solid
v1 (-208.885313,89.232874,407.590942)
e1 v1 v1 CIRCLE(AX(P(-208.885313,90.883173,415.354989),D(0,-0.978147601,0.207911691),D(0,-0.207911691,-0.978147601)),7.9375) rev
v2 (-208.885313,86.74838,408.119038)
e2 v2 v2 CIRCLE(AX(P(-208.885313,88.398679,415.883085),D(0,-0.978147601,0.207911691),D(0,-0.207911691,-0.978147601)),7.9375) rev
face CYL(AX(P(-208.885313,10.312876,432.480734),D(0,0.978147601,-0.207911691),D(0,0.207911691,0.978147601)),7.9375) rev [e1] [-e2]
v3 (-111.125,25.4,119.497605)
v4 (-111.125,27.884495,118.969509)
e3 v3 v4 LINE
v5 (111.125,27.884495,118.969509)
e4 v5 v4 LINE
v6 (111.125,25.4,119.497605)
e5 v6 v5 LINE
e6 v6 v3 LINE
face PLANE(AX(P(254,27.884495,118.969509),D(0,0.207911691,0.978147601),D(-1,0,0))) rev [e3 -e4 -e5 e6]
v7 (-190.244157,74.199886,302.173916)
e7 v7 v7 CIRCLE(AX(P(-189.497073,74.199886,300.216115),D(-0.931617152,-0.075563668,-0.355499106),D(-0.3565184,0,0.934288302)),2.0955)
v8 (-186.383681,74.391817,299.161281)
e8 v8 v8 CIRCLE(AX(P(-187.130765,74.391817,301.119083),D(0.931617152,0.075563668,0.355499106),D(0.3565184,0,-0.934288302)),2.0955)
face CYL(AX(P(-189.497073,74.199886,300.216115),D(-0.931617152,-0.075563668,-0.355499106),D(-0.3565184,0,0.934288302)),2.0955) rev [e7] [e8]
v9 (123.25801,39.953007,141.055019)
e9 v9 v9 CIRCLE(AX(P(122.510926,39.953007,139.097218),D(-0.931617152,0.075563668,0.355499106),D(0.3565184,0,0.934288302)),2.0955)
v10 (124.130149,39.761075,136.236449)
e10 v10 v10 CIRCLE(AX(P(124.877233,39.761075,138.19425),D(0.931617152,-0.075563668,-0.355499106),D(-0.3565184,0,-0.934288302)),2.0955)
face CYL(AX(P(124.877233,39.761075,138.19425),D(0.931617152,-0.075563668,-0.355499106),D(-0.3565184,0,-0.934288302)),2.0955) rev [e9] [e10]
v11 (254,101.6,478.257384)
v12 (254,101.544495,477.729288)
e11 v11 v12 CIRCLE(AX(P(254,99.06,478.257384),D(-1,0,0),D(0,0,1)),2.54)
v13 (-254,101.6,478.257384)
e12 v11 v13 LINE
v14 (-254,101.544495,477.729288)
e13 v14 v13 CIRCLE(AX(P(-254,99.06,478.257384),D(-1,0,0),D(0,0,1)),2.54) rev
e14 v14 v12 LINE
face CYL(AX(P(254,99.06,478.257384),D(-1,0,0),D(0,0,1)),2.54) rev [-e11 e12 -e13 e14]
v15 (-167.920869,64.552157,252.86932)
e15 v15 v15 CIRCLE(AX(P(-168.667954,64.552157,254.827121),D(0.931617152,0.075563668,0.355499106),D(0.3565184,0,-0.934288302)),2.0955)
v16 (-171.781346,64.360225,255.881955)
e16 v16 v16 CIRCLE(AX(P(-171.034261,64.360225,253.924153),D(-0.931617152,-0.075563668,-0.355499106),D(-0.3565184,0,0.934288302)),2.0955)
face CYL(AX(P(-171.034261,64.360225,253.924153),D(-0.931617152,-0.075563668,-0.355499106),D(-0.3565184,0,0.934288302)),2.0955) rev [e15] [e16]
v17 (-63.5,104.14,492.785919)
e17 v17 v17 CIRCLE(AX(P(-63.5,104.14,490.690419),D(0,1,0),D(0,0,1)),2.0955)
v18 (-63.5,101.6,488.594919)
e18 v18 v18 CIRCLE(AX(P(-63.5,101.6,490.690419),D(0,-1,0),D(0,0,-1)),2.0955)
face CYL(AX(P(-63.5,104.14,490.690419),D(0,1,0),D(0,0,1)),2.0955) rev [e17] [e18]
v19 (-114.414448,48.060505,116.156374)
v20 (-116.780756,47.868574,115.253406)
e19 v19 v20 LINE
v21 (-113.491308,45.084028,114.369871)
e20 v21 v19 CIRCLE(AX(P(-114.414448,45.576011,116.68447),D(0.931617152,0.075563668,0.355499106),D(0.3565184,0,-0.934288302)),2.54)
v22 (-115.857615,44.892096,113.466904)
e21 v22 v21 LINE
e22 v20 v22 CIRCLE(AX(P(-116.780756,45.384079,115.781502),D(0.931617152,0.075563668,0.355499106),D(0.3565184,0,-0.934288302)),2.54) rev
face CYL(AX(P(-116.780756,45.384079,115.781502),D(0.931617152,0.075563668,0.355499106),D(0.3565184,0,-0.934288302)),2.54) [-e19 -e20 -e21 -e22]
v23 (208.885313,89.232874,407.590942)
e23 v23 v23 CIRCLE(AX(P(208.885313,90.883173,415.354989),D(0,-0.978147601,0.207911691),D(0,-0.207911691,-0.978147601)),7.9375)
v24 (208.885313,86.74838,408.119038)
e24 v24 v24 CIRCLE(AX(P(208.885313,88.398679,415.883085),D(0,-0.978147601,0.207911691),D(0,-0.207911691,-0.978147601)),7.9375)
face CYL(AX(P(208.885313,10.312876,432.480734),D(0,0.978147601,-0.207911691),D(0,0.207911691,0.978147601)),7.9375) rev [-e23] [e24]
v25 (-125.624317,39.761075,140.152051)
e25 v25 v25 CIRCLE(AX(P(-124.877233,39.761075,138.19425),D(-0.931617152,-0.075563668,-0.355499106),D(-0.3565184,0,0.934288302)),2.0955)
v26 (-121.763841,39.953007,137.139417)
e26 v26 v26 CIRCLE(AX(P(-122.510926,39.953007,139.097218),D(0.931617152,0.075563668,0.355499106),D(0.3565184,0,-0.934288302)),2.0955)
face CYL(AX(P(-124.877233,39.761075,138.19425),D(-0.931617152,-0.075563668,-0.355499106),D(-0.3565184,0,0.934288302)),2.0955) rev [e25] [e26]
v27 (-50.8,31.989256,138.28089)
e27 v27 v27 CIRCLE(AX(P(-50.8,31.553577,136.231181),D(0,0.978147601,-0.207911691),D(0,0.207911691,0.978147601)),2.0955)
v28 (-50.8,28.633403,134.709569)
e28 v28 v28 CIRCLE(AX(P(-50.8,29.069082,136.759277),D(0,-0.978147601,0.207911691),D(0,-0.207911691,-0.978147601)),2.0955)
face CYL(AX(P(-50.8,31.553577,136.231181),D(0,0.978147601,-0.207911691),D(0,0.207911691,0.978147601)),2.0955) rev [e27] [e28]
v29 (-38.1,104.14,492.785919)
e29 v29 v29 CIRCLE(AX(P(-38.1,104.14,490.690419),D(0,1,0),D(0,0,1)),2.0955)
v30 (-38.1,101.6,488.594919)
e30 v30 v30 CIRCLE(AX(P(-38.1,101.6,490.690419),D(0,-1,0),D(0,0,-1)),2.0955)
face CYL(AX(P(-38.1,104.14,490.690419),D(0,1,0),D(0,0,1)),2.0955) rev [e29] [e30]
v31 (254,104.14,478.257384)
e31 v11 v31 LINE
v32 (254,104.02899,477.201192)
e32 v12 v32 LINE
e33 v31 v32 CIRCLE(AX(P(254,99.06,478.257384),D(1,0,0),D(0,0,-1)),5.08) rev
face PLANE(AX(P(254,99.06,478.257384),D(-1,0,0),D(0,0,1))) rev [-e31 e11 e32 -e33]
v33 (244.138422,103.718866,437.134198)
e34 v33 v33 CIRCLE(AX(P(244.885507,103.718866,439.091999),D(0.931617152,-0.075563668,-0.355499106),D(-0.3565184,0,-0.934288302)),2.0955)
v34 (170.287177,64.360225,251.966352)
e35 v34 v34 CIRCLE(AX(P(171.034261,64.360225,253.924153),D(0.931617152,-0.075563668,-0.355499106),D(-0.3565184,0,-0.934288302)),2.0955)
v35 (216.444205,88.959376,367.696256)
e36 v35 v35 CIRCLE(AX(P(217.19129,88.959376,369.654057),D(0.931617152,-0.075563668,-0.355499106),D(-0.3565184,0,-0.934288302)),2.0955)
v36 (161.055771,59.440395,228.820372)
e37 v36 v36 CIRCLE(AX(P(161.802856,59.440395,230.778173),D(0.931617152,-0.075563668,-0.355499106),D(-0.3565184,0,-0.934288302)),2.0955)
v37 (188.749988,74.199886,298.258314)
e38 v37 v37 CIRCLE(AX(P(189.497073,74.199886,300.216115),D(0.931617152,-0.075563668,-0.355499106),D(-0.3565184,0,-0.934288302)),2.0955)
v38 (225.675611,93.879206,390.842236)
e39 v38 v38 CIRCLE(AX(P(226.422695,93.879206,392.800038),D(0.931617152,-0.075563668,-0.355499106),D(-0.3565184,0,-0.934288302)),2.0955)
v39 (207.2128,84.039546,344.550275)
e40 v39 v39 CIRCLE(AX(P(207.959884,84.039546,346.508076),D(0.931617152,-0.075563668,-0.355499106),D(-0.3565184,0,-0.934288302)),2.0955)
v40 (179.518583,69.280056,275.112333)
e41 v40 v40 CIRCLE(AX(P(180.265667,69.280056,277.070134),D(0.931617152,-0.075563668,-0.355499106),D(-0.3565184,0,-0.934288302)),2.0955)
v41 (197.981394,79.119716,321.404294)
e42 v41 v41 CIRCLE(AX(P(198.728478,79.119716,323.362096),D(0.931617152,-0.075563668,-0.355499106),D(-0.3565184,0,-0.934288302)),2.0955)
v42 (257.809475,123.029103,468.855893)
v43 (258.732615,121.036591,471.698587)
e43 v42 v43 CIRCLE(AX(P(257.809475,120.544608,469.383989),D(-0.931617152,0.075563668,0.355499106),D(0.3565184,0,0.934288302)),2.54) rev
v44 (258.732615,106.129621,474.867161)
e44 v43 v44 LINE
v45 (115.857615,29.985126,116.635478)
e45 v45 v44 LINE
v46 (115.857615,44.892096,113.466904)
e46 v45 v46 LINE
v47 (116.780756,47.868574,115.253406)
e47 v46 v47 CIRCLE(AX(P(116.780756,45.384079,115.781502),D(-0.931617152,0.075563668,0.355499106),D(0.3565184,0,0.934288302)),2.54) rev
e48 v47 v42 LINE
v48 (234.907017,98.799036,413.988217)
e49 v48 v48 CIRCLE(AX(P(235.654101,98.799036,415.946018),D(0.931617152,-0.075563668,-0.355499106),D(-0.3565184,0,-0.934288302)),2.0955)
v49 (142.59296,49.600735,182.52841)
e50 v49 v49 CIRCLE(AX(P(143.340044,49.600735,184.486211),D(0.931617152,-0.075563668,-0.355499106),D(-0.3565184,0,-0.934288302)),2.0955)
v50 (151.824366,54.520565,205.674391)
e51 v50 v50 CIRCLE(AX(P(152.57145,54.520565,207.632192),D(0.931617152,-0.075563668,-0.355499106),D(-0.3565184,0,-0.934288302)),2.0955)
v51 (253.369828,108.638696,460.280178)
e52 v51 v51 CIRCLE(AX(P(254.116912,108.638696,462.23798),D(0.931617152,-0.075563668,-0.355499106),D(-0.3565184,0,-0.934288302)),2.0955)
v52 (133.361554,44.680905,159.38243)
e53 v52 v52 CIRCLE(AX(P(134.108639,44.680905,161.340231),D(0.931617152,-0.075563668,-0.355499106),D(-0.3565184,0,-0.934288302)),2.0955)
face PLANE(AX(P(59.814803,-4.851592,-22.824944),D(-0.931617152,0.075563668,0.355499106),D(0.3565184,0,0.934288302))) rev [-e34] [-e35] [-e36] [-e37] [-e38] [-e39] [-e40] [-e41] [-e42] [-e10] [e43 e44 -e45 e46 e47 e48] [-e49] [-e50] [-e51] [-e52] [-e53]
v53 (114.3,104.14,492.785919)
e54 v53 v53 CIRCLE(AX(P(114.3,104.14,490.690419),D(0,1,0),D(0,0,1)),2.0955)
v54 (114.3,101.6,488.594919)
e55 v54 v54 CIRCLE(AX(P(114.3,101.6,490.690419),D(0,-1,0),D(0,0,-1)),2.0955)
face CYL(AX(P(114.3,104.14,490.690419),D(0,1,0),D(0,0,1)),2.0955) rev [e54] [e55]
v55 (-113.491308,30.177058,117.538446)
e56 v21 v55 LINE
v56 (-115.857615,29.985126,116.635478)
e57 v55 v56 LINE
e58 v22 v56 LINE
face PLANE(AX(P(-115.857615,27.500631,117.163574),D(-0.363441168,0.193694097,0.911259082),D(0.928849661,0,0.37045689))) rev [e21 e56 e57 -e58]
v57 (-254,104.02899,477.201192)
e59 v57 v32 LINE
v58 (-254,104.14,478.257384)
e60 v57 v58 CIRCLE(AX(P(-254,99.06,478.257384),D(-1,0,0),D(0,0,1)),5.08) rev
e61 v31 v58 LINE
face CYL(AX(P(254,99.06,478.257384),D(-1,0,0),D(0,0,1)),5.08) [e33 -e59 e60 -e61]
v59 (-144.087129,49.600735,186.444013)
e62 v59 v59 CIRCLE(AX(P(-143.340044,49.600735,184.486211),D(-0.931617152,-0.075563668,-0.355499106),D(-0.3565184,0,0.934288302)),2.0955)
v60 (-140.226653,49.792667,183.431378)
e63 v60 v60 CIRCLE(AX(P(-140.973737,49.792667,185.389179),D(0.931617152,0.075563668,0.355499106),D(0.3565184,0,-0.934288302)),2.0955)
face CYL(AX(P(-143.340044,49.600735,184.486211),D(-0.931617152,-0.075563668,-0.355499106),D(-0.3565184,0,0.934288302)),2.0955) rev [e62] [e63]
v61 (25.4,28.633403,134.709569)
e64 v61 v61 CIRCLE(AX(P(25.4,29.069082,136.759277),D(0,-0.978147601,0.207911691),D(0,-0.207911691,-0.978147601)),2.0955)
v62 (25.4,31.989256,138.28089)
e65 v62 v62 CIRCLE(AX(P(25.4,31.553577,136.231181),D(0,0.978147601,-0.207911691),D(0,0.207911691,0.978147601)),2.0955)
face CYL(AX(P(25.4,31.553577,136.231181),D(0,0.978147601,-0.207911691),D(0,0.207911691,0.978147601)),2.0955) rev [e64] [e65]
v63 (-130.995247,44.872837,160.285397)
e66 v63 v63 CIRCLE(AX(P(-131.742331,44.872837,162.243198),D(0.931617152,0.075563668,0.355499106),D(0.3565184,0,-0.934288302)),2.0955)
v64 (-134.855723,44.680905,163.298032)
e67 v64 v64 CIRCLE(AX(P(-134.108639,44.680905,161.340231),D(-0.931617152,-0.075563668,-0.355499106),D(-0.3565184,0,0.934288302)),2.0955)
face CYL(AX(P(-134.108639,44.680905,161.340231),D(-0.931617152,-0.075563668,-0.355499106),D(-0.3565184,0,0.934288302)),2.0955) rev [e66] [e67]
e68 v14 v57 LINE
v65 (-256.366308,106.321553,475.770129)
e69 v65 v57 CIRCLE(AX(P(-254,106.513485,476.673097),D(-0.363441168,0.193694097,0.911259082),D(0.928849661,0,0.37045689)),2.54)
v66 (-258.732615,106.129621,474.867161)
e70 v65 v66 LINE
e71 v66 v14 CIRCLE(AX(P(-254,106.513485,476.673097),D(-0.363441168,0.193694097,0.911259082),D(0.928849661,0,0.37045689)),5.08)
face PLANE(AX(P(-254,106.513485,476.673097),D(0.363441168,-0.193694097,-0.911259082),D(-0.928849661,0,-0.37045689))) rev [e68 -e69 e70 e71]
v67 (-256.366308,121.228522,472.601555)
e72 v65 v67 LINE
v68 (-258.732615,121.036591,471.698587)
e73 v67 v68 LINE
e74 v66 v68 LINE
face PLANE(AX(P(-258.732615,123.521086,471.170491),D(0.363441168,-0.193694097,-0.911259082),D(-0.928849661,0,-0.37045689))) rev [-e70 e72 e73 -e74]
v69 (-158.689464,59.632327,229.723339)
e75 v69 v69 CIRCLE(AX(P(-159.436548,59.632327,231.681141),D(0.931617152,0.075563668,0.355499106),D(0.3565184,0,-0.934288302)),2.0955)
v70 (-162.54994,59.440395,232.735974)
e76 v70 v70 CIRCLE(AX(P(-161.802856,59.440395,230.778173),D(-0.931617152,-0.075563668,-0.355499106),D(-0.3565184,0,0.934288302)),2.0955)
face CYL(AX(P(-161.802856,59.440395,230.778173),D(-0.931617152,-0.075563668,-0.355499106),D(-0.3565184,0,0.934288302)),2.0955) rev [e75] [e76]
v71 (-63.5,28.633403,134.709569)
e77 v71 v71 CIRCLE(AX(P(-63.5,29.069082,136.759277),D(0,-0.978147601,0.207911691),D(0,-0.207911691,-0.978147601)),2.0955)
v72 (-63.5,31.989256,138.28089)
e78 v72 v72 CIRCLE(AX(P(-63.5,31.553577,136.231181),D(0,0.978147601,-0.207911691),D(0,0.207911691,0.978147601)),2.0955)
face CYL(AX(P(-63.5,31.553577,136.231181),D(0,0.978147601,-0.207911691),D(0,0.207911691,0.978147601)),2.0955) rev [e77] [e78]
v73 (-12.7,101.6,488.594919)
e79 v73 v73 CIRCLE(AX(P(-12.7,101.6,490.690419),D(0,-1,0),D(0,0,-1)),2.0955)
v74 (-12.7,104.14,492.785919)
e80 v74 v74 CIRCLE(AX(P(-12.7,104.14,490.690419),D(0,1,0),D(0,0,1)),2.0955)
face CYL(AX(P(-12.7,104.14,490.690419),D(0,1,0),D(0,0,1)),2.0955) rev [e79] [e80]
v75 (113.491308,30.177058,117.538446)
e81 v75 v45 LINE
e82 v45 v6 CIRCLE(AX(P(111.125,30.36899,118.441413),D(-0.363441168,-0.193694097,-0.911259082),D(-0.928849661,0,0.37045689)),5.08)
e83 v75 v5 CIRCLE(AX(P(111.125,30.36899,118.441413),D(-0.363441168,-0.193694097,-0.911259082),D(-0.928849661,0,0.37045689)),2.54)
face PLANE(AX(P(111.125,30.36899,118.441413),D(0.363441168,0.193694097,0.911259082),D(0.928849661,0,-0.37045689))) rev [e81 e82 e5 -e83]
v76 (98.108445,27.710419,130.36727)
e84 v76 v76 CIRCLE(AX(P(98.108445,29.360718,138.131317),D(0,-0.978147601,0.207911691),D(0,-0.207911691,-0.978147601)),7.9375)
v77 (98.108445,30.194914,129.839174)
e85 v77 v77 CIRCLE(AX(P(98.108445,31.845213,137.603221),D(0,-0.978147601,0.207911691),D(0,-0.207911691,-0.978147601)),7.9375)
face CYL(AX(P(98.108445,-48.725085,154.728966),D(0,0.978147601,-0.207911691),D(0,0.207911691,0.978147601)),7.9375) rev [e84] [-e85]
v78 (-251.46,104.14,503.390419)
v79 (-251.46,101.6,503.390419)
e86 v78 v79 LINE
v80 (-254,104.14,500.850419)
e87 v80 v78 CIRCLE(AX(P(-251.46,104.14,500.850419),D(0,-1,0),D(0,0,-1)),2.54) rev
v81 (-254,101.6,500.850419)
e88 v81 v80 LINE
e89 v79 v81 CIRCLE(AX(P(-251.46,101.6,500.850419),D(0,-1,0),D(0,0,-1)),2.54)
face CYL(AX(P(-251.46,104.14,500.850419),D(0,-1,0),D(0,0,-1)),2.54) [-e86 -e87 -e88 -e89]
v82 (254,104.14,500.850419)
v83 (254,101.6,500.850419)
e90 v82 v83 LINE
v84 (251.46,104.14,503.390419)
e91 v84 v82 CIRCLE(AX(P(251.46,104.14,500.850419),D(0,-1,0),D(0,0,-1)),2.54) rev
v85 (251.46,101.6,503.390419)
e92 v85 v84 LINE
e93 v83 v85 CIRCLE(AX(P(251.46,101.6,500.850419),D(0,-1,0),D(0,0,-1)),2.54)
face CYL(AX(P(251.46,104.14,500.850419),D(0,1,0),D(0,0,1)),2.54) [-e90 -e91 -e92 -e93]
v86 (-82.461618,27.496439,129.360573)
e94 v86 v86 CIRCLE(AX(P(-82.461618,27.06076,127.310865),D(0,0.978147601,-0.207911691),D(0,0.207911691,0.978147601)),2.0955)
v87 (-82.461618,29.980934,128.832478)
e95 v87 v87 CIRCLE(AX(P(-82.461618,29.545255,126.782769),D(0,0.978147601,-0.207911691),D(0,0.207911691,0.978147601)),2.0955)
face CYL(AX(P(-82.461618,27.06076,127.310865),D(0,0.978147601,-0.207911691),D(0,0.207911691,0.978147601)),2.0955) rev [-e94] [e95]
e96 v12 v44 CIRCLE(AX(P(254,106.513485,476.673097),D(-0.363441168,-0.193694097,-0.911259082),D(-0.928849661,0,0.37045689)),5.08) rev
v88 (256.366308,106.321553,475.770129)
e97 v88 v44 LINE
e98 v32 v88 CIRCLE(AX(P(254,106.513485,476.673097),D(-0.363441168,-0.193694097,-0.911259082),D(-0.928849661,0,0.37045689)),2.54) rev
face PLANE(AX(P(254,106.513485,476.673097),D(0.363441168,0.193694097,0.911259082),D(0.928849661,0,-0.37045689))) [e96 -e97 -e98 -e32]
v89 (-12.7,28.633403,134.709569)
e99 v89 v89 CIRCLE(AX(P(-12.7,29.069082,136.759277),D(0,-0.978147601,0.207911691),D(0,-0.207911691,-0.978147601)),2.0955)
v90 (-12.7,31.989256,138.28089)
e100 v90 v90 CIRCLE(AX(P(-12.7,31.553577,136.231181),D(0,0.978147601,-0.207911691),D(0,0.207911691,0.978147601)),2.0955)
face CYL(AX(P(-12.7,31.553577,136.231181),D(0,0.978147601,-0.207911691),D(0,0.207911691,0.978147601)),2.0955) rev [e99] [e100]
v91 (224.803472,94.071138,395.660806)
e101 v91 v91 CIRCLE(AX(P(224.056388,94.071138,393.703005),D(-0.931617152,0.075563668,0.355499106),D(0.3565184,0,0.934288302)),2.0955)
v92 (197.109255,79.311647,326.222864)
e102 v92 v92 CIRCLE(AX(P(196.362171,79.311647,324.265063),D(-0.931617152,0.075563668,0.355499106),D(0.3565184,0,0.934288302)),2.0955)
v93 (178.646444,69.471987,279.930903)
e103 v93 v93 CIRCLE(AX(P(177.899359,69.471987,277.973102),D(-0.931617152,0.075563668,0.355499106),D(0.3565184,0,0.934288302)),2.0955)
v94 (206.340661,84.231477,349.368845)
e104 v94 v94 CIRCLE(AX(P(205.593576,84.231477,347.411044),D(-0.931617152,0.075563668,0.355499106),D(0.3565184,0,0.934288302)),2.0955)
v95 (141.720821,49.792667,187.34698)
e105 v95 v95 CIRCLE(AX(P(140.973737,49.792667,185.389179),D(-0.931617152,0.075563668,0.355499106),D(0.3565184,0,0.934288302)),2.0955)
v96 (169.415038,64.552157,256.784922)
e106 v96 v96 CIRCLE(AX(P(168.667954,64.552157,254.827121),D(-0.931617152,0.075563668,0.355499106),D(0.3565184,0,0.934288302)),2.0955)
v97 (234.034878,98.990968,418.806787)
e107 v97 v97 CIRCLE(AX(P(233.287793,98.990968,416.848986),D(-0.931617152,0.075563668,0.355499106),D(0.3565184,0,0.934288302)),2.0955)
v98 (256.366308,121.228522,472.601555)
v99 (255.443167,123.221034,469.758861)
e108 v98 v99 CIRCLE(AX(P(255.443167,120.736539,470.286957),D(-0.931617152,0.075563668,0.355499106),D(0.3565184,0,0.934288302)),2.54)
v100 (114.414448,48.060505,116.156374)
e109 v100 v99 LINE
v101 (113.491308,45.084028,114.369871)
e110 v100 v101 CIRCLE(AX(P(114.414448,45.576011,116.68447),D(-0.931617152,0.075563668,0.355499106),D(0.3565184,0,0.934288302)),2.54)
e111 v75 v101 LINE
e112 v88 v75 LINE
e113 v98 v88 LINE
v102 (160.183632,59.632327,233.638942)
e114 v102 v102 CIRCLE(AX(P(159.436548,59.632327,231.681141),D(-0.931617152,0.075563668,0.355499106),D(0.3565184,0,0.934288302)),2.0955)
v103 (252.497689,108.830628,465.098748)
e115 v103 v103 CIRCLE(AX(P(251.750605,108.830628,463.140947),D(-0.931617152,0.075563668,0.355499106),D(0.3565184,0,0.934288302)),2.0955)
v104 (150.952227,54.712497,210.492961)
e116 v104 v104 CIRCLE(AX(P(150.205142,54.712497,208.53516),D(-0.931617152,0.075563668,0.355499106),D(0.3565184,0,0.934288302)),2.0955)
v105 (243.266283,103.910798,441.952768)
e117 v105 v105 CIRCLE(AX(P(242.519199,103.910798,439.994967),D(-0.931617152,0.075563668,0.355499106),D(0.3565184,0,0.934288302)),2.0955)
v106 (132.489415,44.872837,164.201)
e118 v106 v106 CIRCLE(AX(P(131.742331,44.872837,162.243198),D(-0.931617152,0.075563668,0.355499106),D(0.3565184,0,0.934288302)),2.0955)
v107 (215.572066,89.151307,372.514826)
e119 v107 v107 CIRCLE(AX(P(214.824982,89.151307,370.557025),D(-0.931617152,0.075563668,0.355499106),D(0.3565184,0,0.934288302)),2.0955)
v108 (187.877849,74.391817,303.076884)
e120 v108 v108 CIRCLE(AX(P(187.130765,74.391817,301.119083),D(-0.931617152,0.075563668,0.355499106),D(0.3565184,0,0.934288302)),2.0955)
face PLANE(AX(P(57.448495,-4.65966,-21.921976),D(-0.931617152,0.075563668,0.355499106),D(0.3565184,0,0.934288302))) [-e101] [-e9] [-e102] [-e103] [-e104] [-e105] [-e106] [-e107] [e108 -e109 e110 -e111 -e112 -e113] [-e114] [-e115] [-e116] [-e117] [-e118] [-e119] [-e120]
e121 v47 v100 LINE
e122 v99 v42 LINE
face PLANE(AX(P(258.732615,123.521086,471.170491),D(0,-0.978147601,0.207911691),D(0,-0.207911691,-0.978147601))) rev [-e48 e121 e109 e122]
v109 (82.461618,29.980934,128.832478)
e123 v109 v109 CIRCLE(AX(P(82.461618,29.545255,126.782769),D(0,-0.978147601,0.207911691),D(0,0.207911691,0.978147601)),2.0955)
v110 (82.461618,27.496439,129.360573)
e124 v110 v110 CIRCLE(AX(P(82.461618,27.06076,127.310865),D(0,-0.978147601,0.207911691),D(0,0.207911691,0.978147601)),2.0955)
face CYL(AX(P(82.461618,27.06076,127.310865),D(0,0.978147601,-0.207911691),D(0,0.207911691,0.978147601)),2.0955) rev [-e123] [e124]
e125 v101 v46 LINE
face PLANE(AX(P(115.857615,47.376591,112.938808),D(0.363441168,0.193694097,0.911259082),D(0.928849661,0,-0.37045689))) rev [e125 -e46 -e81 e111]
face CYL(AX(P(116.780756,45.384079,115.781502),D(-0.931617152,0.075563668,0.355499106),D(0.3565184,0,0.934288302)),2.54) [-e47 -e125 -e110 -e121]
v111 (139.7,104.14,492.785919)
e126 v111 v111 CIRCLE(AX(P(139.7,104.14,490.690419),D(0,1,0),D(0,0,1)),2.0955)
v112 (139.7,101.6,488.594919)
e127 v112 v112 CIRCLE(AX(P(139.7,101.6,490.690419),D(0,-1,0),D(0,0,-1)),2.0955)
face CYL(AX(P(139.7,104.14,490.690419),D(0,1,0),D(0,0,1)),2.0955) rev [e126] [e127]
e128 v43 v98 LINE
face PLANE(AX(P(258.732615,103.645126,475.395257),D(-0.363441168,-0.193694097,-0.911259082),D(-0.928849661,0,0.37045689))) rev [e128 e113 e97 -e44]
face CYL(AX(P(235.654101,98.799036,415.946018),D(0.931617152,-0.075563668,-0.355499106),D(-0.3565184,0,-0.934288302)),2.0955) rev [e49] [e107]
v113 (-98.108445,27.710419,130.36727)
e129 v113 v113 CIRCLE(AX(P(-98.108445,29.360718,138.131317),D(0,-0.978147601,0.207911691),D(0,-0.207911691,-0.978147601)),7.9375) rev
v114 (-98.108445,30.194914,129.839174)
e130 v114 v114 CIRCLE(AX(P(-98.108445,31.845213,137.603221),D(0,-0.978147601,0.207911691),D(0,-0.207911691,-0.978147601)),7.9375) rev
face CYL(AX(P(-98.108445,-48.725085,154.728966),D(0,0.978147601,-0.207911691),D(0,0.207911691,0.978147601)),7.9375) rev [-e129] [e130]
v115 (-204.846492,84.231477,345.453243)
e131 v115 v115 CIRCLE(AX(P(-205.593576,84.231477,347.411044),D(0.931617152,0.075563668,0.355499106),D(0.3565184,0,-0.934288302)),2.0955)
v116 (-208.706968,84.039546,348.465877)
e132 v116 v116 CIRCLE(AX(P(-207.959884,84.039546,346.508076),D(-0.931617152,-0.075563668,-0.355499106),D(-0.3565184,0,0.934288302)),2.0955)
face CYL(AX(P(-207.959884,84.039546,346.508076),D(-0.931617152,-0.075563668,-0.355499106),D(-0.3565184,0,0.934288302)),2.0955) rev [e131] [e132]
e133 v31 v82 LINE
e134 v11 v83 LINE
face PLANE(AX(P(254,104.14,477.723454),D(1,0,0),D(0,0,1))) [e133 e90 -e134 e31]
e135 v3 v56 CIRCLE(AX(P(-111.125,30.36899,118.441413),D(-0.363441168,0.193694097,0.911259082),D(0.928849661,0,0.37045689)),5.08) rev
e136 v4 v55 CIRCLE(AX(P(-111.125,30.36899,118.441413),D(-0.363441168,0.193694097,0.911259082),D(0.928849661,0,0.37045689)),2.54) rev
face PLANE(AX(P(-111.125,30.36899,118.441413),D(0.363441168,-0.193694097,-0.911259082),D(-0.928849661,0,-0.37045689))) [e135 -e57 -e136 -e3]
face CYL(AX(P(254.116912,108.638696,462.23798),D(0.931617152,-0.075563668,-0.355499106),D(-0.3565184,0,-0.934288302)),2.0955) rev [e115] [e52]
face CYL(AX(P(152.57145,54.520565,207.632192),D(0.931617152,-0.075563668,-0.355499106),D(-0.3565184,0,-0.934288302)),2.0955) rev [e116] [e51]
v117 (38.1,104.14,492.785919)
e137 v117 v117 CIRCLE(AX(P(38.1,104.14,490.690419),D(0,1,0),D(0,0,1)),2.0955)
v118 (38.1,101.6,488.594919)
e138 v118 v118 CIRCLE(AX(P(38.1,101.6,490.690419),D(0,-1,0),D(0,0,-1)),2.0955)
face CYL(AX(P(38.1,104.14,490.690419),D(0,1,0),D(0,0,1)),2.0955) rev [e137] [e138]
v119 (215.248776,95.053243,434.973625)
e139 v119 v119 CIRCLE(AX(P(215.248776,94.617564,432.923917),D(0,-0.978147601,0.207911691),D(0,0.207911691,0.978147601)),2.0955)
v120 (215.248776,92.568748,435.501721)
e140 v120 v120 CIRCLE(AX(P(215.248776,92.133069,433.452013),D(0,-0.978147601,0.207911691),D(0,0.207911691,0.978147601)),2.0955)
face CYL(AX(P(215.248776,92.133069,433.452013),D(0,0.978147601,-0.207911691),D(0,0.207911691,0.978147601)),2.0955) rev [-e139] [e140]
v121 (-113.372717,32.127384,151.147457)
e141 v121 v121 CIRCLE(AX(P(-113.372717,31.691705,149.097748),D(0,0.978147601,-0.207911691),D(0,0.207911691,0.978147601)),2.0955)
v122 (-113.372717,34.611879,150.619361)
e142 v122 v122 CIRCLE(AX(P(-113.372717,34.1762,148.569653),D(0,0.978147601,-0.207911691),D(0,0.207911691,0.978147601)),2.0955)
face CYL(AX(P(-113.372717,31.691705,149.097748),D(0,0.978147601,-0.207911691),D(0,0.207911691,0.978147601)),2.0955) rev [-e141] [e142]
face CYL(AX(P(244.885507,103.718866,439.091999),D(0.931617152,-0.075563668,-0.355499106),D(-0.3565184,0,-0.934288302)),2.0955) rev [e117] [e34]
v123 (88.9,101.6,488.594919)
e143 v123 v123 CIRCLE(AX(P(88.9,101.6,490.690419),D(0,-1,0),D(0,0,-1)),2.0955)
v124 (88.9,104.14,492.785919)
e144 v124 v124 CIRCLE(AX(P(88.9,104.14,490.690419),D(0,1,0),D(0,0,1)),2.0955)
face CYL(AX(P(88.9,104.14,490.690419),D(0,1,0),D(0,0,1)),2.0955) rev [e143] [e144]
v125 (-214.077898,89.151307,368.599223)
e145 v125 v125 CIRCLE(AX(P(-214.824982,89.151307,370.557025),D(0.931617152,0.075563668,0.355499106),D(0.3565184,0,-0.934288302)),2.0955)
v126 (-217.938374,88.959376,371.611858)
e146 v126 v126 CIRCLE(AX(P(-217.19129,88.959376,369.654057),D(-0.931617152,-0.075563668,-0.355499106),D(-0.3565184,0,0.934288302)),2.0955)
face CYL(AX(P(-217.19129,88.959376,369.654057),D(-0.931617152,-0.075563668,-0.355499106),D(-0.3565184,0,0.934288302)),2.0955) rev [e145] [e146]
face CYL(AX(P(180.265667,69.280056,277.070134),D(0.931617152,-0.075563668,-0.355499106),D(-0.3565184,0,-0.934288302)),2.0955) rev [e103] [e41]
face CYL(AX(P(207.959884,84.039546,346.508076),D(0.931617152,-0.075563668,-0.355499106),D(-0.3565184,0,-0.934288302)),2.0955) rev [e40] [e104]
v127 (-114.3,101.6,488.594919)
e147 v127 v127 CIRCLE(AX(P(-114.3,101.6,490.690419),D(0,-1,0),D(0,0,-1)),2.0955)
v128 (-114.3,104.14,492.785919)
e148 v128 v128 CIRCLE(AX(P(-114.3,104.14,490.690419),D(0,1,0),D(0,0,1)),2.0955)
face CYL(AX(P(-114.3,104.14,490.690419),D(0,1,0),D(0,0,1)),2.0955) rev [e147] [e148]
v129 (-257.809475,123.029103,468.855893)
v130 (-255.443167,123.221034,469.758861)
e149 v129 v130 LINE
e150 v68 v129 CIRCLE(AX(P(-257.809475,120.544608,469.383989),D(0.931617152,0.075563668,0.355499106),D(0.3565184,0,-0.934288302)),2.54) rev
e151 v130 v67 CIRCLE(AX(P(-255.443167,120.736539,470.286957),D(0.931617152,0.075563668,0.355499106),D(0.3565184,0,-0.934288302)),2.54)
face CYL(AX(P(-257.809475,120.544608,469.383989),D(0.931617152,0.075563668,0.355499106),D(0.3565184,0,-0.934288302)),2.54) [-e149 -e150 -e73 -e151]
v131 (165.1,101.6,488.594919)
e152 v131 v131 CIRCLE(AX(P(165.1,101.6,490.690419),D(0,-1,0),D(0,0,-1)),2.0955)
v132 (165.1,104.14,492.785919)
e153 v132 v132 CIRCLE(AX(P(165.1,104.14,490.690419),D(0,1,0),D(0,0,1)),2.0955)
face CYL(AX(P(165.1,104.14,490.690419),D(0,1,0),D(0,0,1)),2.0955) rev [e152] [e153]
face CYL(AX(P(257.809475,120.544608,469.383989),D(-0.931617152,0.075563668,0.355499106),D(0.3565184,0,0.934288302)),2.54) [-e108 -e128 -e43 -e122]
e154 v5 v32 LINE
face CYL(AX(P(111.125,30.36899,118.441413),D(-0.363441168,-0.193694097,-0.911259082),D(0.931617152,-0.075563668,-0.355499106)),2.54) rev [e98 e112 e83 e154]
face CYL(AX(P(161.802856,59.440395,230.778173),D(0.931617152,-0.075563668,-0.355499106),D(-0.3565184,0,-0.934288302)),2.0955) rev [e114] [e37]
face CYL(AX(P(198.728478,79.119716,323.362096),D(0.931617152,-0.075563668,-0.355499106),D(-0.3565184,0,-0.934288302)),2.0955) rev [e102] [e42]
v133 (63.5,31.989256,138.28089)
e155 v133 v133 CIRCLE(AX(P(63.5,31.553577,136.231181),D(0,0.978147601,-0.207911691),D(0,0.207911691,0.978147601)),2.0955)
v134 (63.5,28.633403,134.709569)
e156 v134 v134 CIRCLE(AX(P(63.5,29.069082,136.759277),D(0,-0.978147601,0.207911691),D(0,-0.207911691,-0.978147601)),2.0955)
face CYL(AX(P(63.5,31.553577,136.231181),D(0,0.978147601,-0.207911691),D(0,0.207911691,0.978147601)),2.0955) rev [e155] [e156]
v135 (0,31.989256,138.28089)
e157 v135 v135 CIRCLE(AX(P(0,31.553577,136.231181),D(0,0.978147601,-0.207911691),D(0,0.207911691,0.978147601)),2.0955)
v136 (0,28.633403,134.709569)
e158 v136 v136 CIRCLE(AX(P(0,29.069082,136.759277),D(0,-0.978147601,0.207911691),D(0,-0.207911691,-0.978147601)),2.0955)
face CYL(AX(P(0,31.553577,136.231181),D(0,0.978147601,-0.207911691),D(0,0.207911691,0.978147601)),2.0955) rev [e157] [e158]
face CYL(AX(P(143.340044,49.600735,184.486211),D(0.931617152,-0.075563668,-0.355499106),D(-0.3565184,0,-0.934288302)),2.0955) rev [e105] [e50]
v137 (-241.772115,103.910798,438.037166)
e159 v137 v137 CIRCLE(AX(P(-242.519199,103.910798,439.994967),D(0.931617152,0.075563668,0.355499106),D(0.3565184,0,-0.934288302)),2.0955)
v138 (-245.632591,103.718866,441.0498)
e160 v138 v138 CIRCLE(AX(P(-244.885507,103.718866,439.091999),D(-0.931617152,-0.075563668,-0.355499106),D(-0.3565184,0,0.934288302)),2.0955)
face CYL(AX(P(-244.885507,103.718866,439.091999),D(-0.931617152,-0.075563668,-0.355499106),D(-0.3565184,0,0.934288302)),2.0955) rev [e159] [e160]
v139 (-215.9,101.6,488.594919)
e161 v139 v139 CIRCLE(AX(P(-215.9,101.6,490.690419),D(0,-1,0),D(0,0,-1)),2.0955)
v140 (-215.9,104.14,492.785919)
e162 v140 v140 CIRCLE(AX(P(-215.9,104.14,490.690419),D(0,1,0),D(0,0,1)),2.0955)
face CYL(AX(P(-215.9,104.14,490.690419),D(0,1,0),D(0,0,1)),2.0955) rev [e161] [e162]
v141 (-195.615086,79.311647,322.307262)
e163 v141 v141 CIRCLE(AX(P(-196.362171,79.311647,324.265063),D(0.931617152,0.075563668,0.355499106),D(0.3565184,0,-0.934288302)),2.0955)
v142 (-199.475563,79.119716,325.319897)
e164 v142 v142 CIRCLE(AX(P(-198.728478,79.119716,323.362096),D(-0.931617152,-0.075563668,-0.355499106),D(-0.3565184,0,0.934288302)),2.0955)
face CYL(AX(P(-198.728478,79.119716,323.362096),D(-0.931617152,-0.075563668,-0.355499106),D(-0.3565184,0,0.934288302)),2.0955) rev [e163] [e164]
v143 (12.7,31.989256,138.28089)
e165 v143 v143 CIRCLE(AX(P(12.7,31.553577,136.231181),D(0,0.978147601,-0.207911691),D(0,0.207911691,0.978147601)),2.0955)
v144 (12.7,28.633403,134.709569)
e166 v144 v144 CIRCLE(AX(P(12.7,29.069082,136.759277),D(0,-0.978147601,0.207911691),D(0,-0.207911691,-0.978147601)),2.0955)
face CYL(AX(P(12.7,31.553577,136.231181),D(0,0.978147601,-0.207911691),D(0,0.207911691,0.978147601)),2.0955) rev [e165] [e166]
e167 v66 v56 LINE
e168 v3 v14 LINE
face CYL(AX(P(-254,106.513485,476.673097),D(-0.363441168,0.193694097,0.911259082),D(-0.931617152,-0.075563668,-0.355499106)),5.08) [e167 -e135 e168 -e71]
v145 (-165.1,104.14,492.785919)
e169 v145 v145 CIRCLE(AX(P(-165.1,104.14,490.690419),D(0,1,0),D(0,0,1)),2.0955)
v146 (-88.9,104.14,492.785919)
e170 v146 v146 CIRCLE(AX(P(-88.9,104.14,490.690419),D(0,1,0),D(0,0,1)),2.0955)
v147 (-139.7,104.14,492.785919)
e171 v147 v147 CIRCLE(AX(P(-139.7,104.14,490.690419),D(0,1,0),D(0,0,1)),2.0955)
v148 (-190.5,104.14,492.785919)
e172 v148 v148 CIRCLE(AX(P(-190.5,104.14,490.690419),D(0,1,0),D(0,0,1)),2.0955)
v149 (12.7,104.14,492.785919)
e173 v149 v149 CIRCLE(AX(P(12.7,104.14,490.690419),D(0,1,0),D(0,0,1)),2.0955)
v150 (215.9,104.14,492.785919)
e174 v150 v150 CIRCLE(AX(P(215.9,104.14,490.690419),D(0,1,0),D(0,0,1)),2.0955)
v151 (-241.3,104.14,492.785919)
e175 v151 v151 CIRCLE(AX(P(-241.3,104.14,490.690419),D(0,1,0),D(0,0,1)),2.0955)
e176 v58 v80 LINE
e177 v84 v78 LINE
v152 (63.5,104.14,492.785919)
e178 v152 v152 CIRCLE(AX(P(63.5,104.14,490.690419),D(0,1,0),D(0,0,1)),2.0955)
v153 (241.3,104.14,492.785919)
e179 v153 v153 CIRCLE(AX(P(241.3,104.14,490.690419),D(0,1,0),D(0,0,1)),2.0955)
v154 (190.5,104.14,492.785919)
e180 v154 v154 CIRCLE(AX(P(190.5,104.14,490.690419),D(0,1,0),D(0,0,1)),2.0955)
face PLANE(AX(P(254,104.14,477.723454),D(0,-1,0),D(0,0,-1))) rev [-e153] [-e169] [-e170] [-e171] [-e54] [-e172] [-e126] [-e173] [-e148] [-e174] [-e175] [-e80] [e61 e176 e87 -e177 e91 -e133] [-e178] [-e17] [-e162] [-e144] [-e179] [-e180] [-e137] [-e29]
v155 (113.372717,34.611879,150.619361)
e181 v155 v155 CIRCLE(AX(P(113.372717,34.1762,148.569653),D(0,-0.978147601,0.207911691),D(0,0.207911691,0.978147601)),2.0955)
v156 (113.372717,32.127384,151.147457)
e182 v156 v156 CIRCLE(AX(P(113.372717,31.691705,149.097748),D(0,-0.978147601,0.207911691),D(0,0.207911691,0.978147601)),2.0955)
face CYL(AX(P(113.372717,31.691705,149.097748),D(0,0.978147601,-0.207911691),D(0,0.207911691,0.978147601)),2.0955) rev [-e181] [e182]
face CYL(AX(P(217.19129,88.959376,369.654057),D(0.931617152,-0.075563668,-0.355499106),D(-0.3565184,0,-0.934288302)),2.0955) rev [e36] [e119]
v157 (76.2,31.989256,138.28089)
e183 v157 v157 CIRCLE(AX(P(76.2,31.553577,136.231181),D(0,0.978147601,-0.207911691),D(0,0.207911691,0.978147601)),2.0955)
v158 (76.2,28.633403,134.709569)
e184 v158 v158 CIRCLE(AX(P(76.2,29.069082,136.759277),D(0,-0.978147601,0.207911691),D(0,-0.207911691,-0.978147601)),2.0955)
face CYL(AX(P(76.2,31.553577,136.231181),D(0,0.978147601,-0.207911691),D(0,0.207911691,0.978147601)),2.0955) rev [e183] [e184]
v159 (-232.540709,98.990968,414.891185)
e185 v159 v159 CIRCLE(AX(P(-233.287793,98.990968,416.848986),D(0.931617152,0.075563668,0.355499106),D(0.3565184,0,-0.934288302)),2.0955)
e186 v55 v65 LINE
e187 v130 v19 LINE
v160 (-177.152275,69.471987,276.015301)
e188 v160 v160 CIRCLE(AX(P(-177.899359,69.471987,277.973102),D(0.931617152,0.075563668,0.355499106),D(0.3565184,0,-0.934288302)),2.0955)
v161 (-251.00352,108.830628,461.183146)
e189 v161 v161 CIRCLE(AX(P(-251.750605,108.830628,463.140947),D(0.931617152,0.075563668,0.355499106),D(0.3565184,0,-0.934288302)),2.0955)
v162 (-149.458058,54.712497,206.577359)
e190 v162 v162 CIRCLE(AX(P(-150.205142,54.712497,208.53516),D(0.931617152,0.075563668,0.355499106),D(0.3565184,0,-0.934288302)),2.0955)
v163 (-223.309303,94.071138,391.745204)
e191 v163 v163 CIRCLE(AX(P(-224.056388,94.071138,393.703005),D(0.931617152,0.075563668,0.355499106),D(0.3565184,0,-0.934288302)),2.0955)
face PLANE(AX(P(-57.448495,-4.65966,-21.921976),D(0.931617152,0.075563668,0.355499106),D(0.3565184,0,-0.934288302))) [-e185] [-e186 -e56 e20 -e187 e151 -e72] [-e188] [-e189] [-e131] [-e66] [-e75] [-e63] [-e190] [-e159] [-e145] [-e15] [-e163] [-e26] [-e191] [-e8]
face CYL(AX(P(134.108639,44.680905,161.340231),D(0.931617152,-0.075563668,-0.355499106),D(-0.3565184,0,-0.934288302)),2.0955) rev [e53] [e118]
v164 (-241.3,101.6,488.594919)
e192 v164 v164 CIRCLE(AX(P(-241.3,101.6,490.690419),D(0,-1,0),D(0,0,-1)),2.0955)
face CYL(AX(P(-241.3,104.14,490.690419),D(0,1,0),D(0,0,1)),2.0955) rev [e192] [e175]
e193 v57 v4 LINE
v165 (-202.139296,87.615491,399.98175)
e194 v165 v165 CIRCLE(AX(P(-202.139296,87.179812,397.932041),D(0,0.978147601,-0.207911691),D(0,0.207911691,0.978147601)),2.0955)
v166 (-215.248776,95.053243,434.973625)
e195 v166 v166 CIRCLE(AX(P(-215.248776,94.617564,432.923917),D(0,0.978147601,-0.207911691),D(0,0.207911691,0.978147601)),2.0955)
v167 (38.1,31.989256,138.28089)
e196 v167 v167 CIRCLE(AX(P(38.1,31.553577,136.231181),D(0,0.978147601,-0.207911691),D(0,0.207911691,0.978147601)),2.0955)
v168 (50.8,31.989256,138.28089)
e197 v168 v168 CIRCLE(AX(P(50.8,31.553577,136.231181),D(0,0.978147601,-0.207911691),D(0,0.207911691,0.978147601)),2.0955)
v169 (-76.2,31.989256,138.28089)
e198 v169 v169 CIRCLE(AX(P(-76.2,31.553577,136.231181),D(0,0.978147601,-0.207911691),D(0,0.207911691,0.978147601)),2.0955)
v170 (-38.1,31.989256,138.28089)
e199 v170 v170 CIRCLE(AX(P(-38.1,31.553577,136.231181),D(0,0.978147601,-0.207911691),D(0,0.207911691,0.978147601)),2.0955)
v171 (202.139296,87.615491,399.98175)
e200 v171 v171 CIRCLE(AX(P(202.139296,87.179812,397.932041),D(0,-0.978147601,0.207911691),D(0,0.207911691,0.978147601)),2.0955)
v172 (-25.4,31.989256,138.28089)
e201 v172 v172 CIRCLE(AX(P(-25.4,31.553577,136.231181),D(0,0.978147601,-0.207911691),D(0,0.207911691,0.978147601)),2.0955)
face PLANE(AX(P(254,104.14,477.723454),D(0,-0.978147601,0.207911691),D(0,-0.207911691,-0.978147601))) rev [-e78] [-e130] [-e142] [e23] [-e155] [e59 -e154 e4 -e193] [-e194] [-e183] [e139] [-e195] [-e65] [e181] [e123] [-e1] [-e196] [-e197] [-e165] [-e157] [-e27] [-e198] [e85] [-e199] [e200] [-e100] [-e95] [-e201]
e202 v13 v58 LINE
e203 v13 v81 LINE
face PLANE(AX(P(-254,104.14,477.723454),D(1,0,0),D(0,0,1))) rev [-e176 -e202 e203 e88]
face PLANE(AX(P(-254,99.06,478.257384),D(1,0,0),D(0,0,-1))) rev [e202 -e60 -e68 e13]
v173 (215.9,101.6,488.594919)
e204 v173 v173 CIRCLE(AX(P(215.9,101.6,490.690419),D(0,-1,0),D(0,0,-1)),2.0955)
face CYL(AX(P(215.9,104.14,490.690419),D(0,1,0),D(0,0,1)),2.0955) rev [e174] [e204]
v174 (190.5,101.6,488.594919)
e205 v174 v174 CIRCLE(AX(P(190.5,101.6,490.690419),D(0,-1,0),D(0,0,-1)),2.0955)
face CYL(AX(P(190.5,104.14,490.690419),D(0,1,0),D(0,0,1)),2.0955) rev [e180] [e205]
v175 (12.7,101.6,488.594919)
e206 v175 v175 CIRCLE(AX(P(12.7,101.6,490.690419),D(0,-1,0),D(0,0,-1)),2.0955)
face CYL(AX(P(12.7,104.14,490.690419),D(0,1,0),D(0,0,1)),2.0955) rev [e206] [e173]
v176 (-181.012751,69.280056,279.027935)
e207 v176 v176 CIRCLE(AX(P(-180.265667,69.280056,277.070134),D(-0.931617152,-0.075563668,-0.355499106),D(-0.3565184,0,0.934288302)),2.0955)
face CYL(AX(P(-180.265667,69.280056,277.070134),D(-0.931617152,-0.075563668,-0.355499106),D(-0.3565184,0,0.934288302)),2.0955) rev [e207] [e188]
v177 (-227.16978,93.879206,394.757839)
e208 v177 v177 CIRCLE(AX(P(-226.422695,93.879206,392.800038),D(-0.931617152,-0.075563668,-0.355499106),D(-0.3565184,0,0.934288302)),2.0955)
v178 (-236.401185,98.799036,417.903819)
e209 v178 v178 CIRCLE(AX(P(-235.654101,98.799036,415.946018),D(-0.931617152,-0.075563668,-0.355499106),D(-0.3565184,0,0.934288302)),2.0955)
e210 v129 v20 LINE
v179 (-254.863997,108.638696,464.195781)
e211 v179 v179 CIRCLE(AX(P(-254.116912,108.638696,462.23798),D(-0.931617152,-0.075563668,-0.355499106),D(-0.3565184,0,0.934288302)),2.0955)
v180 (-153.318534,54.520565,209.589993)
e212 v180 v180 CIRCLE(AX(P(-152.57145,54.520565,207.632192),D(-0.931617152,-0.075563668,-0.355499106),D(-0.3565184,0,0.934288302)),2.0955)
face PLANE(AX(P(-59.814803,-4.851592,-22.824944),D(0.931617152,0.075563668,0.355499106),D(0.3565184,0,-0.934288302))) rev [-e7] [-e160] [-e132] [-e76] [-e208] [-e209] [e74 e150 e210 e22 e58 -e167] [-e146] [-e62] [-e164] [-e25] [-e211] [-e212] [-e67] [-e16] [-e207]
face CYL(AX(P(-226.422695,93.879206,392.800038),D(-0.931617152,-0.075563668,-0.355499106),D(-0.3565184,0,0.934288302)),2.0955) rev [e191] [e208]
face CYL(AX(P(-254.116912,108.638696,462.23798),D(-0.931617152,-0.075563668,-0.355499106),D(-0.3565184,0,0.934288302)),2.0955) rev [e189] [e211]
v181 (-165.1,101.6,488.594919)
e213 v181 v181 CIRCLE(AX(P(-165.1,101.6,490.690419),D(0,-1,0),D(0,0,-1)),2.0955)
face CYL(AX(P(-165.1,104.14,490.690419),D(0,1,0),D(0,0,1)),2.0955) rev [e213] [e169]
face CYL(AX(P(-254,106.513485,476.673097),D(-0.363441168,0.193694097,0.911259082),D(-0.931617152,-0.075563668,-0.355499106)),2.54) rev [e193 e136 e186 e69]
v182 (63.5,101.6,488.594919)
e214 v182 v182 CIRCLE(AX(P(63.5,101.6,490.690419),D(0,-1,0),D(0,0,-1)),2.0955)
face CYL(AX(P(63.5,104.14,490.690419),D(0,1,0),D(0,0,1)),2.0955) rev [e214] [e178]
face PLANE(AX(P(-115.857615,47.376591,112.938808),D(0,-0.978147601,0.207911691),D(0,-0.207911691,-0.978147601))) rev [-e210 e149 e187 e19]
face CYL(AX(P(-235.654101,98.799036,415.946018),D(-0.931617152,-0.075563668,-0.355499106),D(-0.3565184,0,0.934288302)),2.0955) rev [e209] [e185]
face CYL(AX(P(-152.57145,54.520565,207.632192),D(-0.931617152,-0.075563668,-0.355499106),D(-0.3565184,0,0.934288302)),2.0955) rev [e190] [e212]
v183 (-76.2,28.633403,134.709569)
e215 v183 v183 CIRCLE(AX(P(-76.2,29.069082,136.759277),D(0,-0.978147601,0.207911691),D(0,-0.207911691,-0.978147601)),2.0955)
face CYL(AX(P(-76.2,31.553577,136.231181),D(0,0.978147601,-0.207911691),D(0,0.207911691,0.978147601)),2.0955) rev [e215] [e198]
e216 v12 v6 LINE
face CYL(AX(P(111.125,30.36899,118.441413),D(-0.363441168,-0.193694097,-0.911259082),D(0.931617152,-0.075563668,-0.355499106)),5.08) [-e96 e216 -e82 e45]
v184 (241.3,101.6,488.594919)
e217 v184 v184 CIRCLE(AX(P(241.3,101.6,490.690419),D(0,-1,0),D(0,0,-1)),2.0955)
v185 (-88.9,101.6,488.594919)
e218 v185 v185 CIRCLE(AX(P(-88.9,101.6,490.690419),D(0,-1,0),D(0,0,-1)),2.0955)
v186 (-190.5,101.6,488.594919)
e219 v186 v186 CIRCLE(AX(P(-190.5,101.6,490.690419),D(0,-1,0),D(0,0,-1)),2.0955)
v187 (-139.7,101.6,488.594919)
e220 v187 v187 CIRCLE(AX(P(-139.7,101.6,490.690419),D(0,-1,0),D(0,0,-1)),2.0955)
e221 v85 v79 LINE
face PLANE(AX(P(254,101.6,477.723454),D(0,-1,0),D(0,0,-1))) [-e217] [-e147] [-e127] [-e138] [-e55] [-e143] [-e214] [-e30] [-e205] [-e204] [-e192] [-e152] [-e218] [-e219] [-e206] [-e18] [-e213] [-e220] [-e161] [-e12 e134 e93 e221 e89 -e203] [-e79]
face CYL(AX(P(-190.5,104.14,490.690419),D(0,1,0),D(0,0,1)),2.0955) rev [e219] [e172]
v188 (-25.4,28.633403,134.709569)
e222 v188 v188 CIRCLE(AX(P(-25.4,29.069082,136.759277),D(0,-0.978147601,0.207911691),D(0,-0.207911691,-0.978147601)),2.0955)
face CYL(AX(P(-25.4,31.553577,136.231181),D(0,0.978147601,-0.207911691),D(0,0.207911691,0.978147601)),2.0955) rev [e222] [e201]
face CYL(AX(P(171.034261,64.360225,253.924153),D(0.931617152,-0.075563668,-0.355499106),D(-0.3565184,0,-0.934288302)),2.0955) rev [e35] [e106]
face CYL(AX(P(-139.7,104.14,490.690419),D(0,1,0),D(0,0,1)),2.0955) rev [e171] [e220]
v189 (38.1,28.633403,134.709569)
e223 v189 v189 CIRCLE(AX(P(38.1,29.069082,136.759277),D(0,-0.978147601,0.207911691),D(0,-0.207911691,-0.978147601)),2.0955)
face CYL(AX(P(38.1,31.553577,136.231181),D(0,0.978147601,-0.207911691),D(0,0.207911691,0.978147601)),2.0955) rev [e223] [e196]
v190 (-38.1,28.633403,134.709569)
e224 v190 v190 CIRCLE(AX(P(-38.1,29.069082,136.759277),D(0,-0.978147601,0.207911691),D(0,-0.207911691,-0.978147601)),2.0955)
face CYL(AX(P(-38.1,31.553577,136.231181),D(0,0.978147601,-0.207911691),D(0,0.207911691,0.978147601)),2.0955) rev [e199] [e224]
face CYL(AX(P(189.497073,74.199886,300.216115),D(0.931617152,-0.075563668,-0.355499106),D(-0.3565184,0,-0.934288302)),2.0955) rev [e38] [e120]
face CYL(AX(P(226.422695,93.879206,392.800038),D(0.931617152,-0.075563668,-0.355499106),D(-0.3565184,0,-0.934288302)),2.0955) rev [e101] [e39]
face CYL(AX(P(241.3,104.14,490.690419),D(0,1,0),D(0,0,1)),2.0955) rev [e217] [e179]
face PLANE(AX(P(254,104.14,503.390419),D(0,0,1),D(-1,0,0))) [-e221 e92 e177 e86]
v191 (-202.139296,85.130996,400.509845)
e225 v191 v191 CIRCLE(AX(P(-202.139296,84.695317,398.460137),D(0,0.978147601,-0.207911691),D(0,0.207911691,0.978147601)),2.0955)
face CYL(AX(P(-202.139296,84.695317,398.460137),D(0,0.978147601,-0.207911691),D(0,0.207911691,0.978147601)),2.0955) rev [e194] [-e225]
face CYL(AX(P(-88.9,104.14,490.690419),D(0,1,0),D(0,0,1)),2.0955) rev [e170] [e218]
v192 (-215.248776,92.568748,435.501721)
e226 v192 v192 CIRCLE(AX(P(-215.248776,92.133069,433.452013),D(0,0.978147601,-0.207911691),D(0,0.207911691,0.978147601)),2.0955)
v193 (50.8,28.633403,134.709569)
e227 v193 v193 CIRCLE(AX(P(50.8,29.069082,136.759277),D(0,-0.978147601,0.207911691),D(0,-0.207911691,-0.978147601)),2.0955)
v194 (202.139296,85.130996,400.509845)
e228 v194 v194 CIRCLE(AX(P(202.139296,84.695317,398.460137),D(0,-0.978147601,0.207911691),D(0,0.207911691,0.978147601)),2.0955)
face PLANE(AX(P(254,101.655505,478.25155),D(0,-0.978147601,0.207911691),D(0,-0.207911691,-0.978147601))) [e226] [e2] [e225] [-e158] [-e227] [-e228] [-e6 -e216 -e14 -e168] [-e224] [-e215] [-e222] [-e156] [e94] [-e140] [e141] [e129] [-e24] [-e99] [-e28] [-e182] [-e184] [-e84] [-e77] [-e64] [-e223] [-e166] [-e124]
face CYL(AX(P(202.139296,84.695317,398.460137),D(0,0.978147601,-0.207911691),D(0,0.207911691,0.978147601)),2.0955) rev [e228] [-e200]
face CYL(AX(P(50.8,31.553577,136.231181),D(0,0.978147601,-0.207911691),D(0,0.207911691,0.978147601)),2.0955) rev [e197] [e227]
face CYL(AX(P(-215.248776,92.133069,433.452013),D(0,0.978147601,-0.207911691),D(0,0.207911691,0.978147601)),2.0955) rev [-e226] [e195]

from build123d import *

# Parameters (mm, degrees)
BOSS_EXTRUDE1_DEPTH             = 254
CONVERT_SOLID1_START            = -254
CONVERT_SOLID1_DEPTH            = 508
CONVERT_SOLID1_2_DEPTH          = 508
CUT_EXTRUDE1_DEPTH              = 574.396643949
EDGE_FLANGE1_DEPTH              = 393.117270957
EDGE_FLANGE1_BEND_DEPTH         = 393.117270957
SKETCH12_R                      = 7.9375
CUT_EXTRUDE2_DEPTH              = 580.286449316
F_1_4_0_25_DIAMETER_HOLE1_D     = 4.191
F_1_4_0_25_DIAMETER_HOLE1_DEPTH = 254
F_1_4_0_25_DIAMETER_HOLE1_TIP   = 1.259103427
F_1_4_0_25_DIAMETER_HOLE2_D     = 4.191
F_1_4_0_25_DIAMETER_HOLE2_DEPTH = 254
F_1_4_0_25_DIAMETER_HOLE2_TIP   = 1.259103427
F_1_4_0_25_DIAMETER_HOLE3_D     = 4.191
F_1_4_0_25_DIAMETER_HOLE3_DEPTH = 254
F_1_4_0_25_DIAMETER_HOLE3_TIP   = 1.259103427
F_1_4_0_25_DIAMETER_HOLE5_D     = 4.191
F_1_4_0_25_DIAMETER_HOLE5_DEPTH = 254
F_1_4_0_25_DIAMETER_HOLE5_TIP   = 1.259103427
SKETCH25_R                      = 2.0955
CUT_EXTRUDE3_DEPTH              = 2.54
FILLET1_R                       = 2.54


# Read off the part's stored shape, not the designer's step: Convert-Solid1
# Sheet-metal steps are written as plain solids
with BuildPart() as part:
    # Sketch3 → Boss-Extrude1 (new, symmetric)
    with BuildSketch(Plane(origin=(0, 0, 0), x_dir=(0, 0, -1), z_dir=(1, 0, 0))):
        Polygon((-477.990419123, 101.6), (-503.390419123, 101.6), (-503.390419123, 104.14), (-477.723454365, 104.14), (-118.969509086, 27.884494906), (-119.497604781, 25.4), align=None)
    extrude(amount=BOSS_EXTRUDE1_DEPTH, both=True)

    # Convert-Solid1 outline → Convert-Solid1 (cut)
    with BuildSketch(Plane.YZ.offset(CONVERT_SOLID1_START)):
        with BuildLine():
            Line((104.14, 477.723454365), (104.14, 478.257383881))
            ThreePointArc((104.14, 478.257383881), (104.112171228, 477.726379287), (104.028989812, 477.201192491))
            Line((104.028989812, 477.201192491), (104.14, 477.723454365))
        make_face()
    extrude(amount=CONVERT_SOLID1_DEPTH, mode=Mode.SUBTRACT)

    # Convert-Solid1 2 outline → Convert-Solid1 2 (add)
    with BuildSketch(Plane.YZ.offset(CONVERT_SOLID1_START)):
        with BuildLine():
            Line((101.6, 477.990419123), (101.6, 478.257383881))
            ThreePointArc((101.6, 478.257383881), (101.586085614, 477.991881584), (101.544494906, 477.729288186))
            Line((101.544494906, 477.729288186), (101.6, 477.990419123))
        make_face()
    extrude(amount=CONVERT_SOLID1_2_DEPTH)

    # Sketch8 → Cut-Extrude1 (cut, through all)
    with BuildSketch(Plane(origin=(0, 2.484494906, -0.528095695), x_dir=(1, 0, 0), z_dir=(0, 0.978147600733807, -0.20791169081775257))):
        Polygon((254, -488.402044668), (111.125, -122.167252357), (254, -122.167252357), align=None)
        Polygon((-111.125, -122.167252357), (-254, -488.402044668), (-254, -122.167252357), align=None)
    extrude(amount=-CUT_EXTRUDE1_DEPTH, mode=Mode.SUBTRACT)

    # Edge-Flange1 section (across the edge) → Edge-Flange1 (add)
    with BuildSketch(Plane(origin=(256.366307566, 103.837058096, 476.298224762), x_dir=(-0.9316171518495571, 0.07556366768945466, 0.3554991061944279), z_dir=(-0.36344116770079793, -0.19369409723586034, -0.9112590818841071))):
        with BuildLine():
            Line((-2.54, 2.54), (-2.54, 20.32))
            Line((-2.54, 20.32), (0, 20.32))
            Line((0, 20.32), (0, 2.54))
            ThreePointArc((0, 2.54), (0.743948776, 0.743948776), (2.54, 0))
            Line((2.54, 0), (2.54, -2.54))
            ThreePointArc((2.54, -2.54), (-1.052102448, -1.052102448), (-2.54, 2.54))
        make_face()
    extrude(amount=EDGE_FLANGE1_DEPTH)

    # Edge-Flange1 section 2 (across the edge) → Edge-Flange1 bend (add)
    with BuildSketch(Plane(origin=(-113.491307566, 27.69256319, 118.066541356), x_dir=(0.9316171518495615, 0.07556366768945232, 0.35549910619441694), z_dir=(-0.3634411677007866, 0.19369409723586137, 0.9112590818841114))):
        with BuildLine():
            Line((-2.54, 2.54), (-2.54, 20.32))
            Line((-2.54, 20.32), (0, 20.32))
            Line((0, 20.32), (0, 2.54))
            ThreePointArc((0, 2.54), (0.743948776, 0.743948776), (2.54, 0))
            Line((2.54, 0), (2.54, -2.54))
            ThreePointArc((2.54, -2.54), (-1.052102448, -1.052102448), (-2.54, 2.54))
        make_face()
    extrude(amount=EDGE_FLANGE1_BEND_DEPTH)

    # Sketch12 → Cut-Extrude2 (cut, symmetric)
    with BuildSketch(Plane(origin=(0, 2.484494906, -0.528095695), x_dir=(1, 0, 0), z_dir=(0, 0.978147600733807, -0.20791169081775257))):
        with Locations(Location((208.885313066, -425.17416024, 0), (0, 0, 90))):
            Circle(SKETCH12_R)
        with Locations(Location((98.108445151, -141.217252357, 0), (0, 0, 90))):
            Circle(SKETCH12_R)
    cut_extrude2 = extrude(amount=CUT_EXTRUDE2_DEPTH, both=True, mode=Mode.SUBTRACT)

    # Mirror8: Cut-Extrude2 across plane
    add(cut_extrude2.mirror(Plane(origin=(0, 0, 0), x_dir=(0, 0, 1), z_dir=(1, 0, 0))), mode=Mode.SUBTRACT)

    # 1/4 (0.25) Diameter Hole1
    with Locations(Plane(origin=(0, 104.14, 0), x_dir=(1, 0, 0), z_dir=(0, 1, 0))):
        with Locations((-241.3, -490.690419123), (-215.9, -490.690419123), (-190.5, -490.690419123), (-165.1, -490.690419123), (-139.7, -490.690419123), (-114.3, -490.690419123), (-88.9, -490.690419123), (-63.5, -490.690419123), (-38.1, -490.690419123), (-12.7, -490.690419123), (12.7, -490.690419123), (38.1, -490.690419123), (63.5, -490.690419123), (88.9, -490.690419123), (114.3, -490.690419123), (139.7, -490.690419123), (165.1, -490.690419123), (190.5, -490.690419123), (215.9, -490.690419123), (241.3, -490.690419123), (266.7, -490.690419123)):
            Hole(F_1_4_0_25_DIAMETER_HOLE1_D / 2, depth=F_1_4_0_25_DIAMETER_HOLE1_DEPTH)
            with Locations((0, 0, -(F_1_4_0_25_DIAMETER_HOLE1_DEPTH + F_1_4_0_25_DIAMETER_HOLE1_TIP / 2))):  # 118° drill point
                Cone(0, F_1_4_0_25_DIAMETER_HOLE1_D / 2, F_1_4_0_25_DIAMETER_HOLE1_TIP, mode=Mode.SUBTRACT)

    # 1/4 (0.25) Diameter Hole2
    with Locations(Plane(origin=(59.814802644, -4.851591516, -22.824943524), x_dir=(-0.35412064344222605, 0.031373259319903056, -0.9346733592478765), z_dir=(0.9316171518495572, -0.07556366768945416, -0.3554991061944278))):
        with Locations((-518.621219682, 130.197638553), (-493.872607959, 124.482201754), (-469.123996237, 118.766764955), (-444.375384514, 113.051328156), (-419.626772792, 107.335891357), (-394.878161069, 101.620454558), (-370.129549346, 95.905017759), (-345.380937624, 90.18958096), (-320.632325901, 84.474144161), (-295.883714179, 78.758707362), (-271.135102456, 73.043270563), (-246.386490734, 67.327833764), (-221.637879011, 61.612396964), (-196.889267288, 55.896960165), (-172.140655566, 50.181523366)):
            Hole(F_1_4_0_25_DIAMETER_HOLE2_D / 2, depth=F_1_4_0_25_DIAMETER_HOLE2_DEPTH)
            with Locations((0, 0, -(F_1_4_0_25_DIAMETER_HOLE2_DEPTH + F_1_4_0_25_DIAMETER_HOLE2_TIP / 2))):  # 118° drill point
                Cone(0, F_1_4_0_25_DIAMETER_HOLE2_D / 2, F_1_4_0_25_DIAMETER_HOLE2_TIP, mode=Mode.SUBTRACT)

    # 1/4 (0.25) Diameter Hole3
    with Locations(Plane(origin=(-59.814802644, -4.851591516, -22.824943524), x_dir=(-0.3541206434422149, -0.03137325931990071, 0.9346733592478808), z_dir=(-0.9316171518495615, -0.07556366768945355, -0.3554991061944165))):
        with Locations((518.621219682, 130.197638553), (493.872607959, 124.482201754), (469.123996237, 118.766764955), (444.375384514, 113.051328156), (419.626772792, 107.335891357), (394.878161069, 101.620454558), (370.129549346, 95.905017759), (345.380937624, 90.18958096), (320.632325901, 84.474144161), (295.883714179, 78.758707362), (271.135102456, 73.043270563), (246.386490734, 67.327833764), (221.637879011, 61.612396964), (196.889267288, 55.896960165), (172.140655566, 50.181523366)):
            Hole(F_1_4_0_25_DIAMETER_HOLE3_D / 2, depth=F_1_4_0_25_DIAMETER_HOLE3_DEPTH)
            with Locations((0, 0, -(F_1_4_0_25_DIAMETER_HOLE3_DEPTH + F_1_4_0_25_DIAMETER_HOLE3_TIP / 2))):  # 118° drill point
                Cone(0, F_1_4_0_25_DIAMETER_HOLE3_D / 2, F_1_4_0_25_DIAMETER_HOLE3_TIP, mode=Mode.SUBTRACT)

    # 1/4 (0.25) Diameter Hole5
    with Locations(Plane(origin=(0, 2.484494906, -0.528095695), x_dir=(1, 0, 0), z_dir=(0, 0.9781476007338071, -0.2079116908177526))):
        with Locations((76.2, -139.814560704), (63.5, -139.814560704), (50.8, -139.814560704), (38.1, -139.814560704), (25.4, -139.814560704), (12.7, -139.814560704), (0, -139.814560704), (-12.7, -139.814560704), (-25.4, -139.814560704), (-38.1, -139.814560704), (-50.8, -139.814560704), (-63.5, -139.814560704), (-76.2, -139.814560704)):
            Hole(F_1_4_0_25_DIAMETER_HOLE5_D / 2, depth=F_1_4_0_25_DIAMETER_HOLE5_DEPTH)
            with Locations((0, 0, -(F_1_4_0_25_DIAMETER_HOLE5_DEPTH + F_1_4_0_25_DIAMETER_HOLE5_TIP / 2))):  # 118° drill point
                Cone(0, F_1_4_0_25_DIAMETER_HOLE5_D / 2, F_1_4_0_25_DIAMETER_HOLE5_TIP, mode=Mode.SUBTRACT)

    # Sketch25 → Cut-Extrude3 (cut)
    with BuildSketch(Plane(origin=(0, 2.484494906, -0.528095695), x_dir=(1, 0, 0), z_dir=(0, 0.9781476007338071, -0.2079116908177526))):
        with Locations(Location((-215.248775979, -443.13558852, 0), (0, 0, 270))):
            Circle(SKETCH25_R)
        with Locations(Location((-202.139295591, -407.361973607, 0), (0, 0, 270))):
            Circle(SKETCH25_R)
        with Locations(Location((-113.372717488, -152.428680891, 0), (0, 0, 270))):
            Circle(SKETCH25_R)
        with Locations(Location((-82.461618252, -130.155065468, 0), (0, 0, 270))):
            Circle(SKETCH25_R)
    cut_extrude3 = extrude(amount=-CUT_EXTRUDE3_DEPTH, mode=Mode.SUBTRACT)

    # Mirror9: Cut-Extrude3 across plane
    add(cut_extrude3.mirror(Plane(origin=(0, 0, 0), x_dir=(0, 0, 1), z_dir=(1, 0, 0))), mode=Mode.SUBTRACT)

    # Fillet1
    fillet1_edges = [part.edges().sort_by_distance(p)[0] for p in [
        (254, 102.87, 503.390419123),
        (-254, 102.87, 503.390419123),
        (257.549461349, 123.617051485, 471.621975339),
        (114.674461349, 47.472556579, 113.390291934),
        (-114.674461349, 47.472556579, 113.390291934),
        (-257.549461349, 123.617051485, 471.621975339),
    ]]
    fillet(fillet1_edges, radius=FILLET1_R)


solid = part.part
